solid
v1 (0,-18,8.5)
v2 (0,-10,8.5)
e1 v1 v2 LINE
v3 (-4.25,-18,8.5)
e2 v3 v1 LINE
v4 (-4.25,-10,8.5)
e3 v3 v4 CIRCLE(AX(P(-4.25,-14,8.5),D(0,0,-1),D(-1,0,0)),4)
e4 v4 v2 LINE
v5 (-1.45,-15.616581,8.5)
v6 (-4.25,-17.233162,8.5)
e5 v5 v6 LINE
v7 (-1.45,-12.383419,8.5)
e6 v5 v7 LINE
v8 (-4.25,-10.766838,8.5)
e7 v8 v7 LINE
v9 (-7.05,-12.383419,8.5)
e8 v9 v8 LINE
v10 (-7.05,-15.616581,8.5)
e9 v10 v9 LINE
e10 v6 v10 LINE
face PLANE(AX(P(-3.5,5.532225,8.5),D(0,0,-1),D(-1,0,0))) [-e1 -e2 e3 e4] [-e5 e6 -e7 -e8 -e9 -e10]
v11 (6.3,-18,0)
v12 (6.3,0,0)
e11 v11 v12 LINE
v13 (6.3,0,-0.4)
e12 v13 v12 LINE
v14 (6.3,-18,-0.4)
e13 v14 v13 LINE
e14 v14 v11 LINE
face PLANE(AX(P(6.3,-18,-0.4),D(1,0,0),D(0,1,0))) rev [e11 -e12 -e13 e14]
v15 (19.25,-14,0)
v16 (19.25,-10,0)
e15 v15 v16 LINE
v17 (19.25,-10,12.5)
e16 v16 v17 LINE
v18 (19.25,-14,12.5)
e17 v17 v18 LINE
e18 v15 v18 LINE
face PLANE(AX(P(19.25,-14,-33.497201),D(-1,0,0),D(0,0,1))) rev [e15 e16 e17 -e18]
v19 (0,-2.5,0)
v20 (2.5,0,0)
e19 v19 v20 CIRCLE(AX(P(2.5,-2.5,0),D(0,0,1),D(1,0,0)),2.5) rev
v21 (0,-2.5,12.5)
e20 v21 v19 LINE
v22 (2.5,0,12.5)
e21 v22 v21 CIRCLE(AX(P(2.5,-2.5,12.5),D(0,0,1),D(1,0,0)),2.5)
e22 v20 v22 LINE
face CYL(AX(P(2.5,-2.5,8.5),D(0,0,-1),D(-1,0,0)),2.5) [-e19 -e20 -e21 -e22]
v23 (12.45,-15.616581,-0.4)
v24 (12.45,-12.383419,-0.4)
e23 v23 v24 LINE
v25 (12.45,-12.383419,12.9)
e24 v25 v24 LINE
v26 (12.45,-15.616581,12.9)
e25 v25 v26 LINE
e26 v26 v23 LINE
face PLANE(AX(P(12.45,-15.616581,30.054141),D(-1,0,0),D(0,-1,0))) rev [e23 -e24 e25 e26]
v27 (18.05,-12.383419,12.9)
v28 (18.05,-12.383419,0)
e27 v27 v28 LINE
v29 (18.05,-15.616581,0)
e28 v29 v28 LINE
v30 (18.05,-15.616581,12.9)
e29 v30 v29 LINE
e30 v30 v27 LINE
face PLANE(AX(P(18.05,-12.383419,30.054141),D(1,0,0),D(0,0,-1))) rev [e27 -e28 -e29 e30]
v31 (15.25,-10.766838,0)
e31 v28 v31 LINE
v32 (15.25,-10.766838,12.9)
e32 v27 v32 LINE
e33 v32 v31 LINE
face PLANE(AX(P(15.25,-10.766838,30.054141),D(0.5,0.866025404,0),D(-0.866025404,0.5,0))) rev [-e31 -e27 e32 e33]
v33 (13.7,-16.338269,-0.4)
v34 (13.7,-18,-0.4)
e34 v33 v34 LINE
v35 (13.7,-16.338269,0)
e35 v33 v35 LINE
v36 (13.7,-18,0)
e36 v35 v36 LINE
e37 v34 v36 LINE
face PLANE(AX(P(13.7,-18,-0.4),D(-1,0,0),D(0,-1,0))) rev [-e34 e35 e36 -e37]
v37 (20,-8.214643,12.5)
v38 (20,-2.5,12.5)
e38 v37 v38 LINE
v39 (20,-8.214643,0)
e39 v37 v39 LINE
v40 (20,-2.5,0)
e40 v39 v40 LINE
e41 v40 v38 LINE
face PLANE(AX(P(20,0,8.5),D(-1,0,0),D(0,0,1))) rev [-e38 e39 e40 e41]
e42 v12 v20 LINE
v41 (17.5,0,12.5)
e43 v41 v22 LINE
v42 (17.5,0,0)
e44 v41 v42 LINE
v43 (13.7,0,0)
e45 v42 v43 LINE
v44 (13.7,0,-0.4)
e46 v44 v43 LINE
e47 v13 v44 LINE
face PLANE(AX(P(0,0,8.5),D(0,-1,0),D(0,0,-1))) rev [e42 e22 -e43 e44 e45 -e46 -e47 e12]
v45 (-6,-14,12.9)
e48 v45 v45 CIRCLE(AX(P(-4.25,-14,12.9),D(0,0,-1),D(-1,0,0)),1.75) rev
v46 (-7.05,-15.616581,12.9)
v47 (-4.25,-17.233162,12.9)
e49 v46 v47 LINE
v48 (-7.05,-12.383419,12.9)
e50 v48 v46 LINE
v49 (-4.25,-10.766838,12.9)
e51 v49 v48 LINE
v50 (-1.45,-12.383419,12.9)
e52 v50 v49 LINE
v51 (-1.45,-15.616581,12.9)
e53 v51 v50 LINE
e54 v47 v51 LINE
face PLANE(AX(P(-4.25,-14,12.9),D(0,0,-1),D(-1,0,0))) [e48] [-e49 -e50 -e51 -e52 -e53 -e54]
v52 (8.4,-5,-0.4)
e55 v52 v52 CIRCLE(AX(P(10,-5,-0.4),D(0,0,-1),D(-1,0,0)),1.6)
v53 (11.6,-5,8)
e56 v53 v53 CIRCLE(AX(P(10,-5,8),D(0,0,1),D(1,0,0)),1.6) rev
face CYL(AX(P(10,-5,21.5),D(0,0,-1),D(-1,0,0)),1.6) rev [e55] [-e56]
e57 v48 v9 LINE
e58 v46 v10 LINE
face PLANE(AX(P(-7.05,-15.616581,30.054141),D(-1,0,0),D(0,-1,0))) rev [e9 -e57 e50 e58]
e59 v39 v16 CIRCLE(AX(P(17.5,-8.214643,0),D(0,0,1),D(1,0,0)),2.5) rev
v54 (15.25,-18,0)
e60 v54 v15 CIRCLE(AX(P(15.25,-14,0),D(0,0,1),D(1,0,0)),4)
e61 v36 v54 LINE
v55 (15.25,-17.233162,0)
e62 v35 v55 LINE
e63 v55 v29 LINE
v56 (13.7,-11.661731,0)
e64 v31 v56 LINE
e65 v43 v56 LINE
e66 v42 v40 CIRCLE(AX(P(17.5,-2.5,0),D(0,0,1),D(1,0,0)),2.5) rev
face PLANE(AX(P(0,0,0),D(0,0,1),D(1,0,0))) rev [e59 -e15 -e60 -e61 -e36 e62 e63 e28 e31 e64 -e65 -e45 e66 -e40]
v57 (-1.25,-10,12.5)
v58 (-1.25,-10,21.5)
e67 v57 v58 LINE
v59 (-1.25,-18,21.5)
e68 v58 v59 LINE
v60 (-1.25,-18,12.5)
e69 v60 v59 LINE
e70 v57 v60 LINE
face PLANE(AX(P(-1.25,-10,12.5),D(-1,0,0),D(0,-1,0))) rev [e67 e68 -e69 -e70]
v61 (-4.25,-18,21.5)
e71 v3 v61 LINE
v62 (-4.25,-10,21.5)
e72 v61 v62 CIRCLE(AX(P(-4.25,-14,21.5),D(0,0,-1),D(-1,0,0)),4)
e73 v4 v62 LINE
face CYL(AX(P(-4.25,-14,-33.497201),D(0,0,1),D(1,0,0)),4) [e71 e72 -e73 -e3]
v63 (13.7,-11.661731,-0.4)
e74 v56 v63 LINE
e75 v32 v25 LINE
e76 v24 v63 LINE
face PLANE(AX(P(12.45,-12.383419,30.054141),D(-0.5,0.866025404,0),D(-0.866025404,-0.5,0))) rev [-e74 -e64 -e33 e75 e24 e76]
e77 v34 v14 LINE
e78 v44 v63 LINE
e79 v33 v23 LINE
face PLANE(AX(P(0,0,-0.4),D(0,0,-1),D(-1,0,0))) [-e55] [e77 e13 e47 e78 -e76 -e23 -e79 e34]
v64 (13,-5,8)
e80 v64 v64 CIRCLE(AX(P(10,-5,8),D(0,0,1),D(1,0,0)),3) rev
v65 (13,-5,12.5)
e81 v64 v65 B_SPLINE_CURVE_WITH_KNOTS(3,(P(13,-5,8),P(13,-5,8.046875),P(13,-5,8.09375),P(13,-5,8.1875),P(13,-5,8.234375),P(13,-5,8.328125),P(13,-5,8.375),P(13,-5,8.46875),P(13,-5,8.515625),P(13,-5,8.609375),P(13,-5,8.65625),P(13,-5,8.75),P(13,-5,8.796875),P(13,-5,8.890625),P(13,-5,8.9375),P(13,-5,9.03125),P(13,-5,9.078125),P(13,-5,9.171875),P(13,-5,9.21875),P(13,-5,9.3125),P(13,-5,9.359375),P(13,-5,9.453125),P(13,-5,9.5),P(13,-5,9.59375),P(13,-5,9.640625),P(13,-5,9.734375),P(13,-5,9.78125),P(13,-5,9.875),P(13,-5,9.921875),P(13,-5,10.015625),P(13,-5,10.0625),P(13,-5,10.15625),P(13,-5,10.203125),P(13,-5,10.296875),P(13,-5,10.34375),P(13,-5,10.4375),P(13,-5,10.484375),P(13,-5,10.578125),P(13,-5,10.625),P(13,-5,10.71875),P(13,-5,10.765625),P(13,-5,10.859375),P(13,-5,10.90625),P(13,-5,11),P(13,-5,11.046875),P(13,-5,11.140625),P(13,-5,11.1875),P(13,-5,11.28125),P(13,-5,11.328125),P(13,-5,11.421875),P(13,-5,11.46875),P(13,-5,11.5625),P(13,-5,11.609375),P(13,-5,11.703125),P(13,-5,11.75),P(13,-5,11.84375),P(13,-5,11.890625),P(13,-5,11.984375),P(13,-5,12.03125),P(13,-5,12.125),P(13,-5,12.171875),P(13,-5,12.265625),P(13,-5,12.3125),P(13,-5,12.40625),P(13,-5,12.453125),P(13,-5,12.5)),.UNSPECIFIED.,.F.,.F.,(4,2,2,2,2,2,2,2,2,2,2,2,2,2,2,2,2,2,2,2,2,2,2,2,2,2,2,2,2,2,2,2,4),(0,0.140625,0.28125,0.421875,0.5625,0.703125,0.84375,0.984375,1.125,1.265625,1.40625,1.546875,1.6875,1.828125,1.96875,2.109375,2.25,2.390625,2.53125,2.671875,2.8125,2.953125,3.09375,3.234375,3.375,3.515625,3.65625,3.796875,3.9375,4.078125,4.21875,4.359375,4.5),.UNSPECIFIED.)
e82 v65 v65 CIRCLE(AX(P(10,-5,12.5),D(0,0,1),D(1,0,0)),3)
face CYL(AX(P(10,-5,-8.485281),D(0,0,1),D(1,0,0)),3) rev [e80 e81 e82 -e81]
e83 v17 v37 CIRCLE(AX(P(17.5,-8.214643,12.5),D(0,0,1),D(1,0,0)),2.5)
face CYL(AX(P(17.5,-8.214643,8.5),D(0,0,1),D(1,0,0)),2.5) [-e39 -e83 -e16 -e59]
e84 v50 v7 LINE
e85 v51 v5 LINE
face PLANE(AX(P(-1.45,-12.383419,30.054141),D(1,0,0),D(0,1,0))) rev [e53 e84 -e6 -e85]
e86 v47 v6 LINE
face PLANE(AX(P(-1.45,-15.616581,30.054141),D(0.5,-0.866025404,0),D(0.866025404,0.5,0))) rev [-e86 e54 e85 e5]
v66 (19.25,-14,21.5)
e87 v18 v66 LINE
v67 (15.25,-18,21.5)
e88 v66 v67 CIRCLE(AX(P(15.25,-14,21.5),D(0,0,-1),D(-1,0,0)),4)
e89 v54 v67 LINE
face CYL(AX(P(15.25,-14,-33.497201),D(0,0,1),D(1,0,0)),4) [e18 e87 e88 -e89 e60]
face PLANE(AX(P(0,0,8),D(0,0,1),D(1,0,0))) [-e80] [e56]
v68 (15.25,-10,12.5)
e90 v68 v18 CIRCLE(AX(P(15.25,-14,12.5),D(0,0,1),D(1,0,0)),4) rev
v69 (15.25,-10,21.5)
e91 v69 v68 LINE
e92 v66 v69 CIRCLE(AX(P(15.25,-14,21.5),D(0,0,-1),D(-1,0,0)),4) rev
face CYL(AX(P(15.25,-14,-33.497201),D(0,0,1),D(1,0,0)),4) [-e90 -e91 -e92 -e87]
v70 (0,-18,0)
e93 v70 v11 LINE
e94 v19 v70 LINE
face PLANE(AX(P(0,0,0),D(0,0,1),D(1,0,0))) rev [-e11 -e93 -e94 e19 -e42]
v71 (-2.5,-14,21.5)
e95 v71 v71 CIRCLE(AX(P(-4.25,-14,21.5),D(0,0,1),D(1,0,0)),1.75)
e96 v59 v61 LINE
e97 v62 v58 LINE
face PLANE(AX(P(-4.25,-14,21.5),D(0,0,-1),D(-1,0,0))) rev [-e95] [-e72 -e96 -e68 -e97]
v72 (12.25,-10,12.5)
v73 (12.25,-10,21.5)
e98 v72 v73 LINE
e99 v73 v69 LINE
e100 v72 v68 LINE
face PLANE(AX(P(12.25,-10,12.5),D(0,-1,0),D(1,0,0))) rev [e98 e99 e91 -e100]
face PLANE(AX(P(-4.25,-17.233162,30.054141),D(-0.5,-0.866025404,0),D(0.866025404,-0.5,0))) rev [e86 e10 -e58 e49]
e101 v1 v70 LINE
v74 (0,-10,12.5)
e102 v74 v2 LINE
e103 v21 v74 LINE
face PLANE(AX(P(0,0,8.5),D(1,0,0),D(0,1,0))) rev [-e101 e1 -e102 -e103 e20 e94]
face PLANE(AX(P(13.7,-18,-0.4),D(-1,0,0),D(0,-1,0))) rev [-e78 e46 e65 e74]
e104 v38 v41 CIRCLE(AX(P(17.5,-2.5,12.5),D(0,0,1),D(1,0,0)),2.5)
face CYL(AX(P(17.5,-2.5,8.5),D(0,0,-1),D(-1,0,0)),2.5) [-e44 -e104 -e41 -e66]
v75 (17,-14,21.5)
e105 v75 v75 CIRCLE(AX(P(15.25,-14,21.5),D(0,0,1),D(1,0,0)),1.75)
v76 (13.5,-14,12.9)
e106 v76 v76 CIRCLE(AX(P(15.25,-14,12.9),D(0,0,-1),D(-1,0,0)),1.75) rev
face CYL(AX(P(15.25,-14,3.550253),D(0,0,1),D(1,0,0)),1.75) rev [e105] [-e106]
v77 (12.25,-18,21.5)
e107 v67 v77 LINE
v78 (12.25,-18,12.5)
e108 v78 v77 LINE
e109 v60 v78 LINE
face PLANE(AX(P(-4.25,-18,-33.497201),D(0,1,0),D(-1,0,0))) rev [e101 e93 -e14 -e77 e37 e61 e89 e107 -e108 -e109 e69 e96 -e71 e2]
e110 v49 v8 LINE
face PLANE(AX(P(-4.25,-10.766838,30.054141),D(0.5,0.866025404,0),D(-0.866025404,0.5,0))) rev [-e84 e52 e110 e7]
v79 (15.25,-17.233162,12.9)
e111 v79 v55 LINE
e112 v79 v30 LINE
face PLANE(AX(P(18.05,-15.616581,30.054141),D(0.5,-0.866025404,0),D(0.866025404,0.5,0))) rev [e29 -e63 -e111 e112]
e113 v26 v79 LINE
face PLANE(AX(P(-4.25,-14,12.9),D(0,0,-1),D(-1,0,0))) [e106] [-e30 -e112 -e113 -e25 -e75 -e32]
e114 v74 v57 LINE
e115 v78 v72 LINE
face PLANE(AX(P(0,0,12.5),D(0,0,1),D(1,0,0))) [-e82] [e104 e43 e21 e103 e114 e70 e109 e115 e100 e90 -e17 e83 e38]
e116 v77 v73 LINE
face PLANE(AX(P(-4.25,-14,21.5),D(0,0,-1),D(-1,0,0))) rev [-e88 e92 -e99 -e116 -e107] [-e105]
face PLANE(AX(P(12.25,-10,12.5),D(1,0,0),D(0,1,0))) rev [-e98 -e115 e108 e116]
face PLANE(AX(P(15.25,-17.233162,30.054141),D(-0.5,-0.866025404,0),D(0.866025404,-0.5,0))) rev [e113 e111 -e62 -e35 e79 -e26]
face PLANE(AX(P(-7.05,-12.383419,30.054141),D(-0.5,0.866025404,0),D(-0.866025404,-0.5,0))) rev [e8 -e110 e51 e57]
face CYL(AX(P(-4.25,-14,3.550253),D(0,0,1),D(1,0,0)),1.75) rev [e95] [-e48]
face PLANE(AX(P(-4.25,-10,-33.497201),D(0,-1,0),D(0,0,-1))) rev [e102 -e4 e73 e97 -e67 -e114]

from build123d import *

# Parameters (mm, degrees)
SKETCH_1_W               = 20
SKETCH_1_H               = 10
EXTRUDE_1_DEPTH          = 8.5
EXTRUDE_3_DEPTH          = 8.5
EXTRUDE_3_DEPTH_BACK     = 13
CUT_EXTRUDE_1_DEPTH      = 9
SKETCH_11_W              = 7.4
SKETCH_11_H              = 18
EXTRUDE_5_DEPTH          = 0.4
SKETCH_14_W              = 13
SKETCH_14_H              = 8.5
CUT_EXTRUDE_7_DEPTH      = 8
SKETCH_6_R               = 1.75
CUT_EXTRUDE_2_DEPTH      = 12.8
CUT_EXTRUDE_3_DEPTH      = 35.441980199
CUT_EXTRUDE_3_DEPTH_BACK = 12.9
SKETCH_15_W              = 3.5
SKETCH_15_H              = 8
CUT_EXTRUDE_8_DEPTH      = 8.5
SKETCH_12_R              = 1.6
CUT_EXTRUDE_4_DEPTH      = 35.693082884
SKETCH_13_R              = 3
CUT_EXTRUDE_5_DEPTH      = 4.5
FILLET_1_R               = 2.5
FILLET_2_R               = 4


# Some blends are built 0.0001 mm under size
with BuildPart() as part:
    # Эскиз1 → Бобышка-Вытянуть1 (new body)
    with BuildSketch(Plane.XY):
        with Locations((10, -5)):
            Rectangle(SKETCH_1_W, SKETCH_1_H)
    extrude(amount=EXTRUDE_1_DEPTH)

    # Эскиз4 → Бобышка-Вытянуть3 (add, two sides: drawn at the far end of the back side and taken through both)
    with BuildSketch(Plane(origin=(0, 0, 8.5), x_dir=(-1, 0, 0), z_dir=(0, 0, -1)).offset(-EXTRUDE_3_DEPTH_BACK)):
        with BuildLine():
            Line((4.25, -10), (0, -10))
            Line((0, -10), (0, 0))
            Line((0, 0), (-20, 0))
            Line((-20, 0), (-20, -10))
            Line((-20, -10), (-19.25, -10))
            Line((-19.25, -10), (-19.25, -14))
            ThreePointArc((-19.25, -14), (-18.078427125, -16.828427125), (-15.25, -18))
            Line((-15.25, -18), (4.25, -18))
            ThreePointArc((4.25, -18), (8.25, -14), (4.25, -10))
        make_face()
    extrude(amount=EXTRUDE_3_DEPTH + EXTRUDE_3_DEPTH_BACK)

    # Эскиз5 → Вырез-Вытянуть1 (cut)
    with BuildSketch(Plane.XY.offset(21.5)):
        Polygon((-1.25, -10), (-1.25, -18), (12.25, -18), (12.25, -10), (20, -10), (20, 0), (0, 0), (0, -10), align=None)
    extrude(amount=-CUT_EXTRUDE_1_DEPTH, mode=Mode.SUBTRACT)

    # Эскиз11 → Бобышка-Вытянуть5 (add)
    with BuildSketch(Plane(origin=(0, 0, 0), x_dir=(-1, 0, 0), z_dir=(0, 0, -1))):
        with Locations((-10, -9)):
            Rectangle(SKETCH_11_W, SKETCH_11_H)
    extrude(amount=EXTRUDE_5_DEPTH)

    # Эскиз14 → Вырез-Вытянуть7 (cut)
    with BuildSketch(Plane(origin=(9.75, -18, 0), x_dir=(-1, 0, 0), z_dir=(0, 1, 0))):
        with Locations((19.75, 4.25)):
            Rectangle(SKETCH_14_W, SKETCH_14_H)
    extrude(amount=CUT_EXTRUDE_7_DEPTH, mode=Mode.SUBTRACT)

    # Эскиз6 → Вырез-Вытянуть2 (cut)
    with BuildSketch(Plane.XY.offset(21.5)):
        with Locations((-4.25, -14)):
            Circle(SKETCH_6_R)
        with Locations((15.25, -14)):
            Circle(SKETCH_6_R)
    extrude(amount=-CUT_EXTRUDE_2_DEPTH, mode=Mode.SUBTRACT)

    # Эскиз7 → Вырез-Вытянуть3 (cut, two sides: drawn at the far end of the back side and taken through both)
    with BuildSketch(Plane(origin=(0, 0, 0), x_dir=(-1, 0, 0), z_dir=(0, 0, -1)).offset(-CUT_EXTRUDE_3_DEPTH_BACK)):
        Polygon((-15.25, -10.766838493), (-18.05, -12.383419246), (-18.05, -15.616580754), (-15.25, -17.233161507), (-12.45, -15.616580754), (-12.45, -12.383419246), align=None)
        Polygon((4.25, -10.766838493), (1.45, -12.383419246), (1.45, -15.616580754), (4.25, -17.233161507), (7.05, -15.616580754), (7.05, -12.383419246), align=None)
    extrude(amount=CUT_EXTRUDE_3_DEPTH + CUT_EXTRUDE_3_DEPTH_BACK, mode=Mode.SUBTRACT)

    # Эскиз15 → Вырез-Вытянуть8 (cut)
    with BuildSketch(Plane(origin=(0, 0, 0), x_dir=(-1, 0, 0), z_dir=(0, 0, -1))):
        with Locations((1.75, -14)):
            Rectangle(SKETCH_15_W, SKETCH_15_H)
    extrude(amount=-CUT_EXTRUDE_8_DEPTH, mode=Mode.SUBTRACT)

    # Эскиз12 → Вырез-Вытянуть4 (cut, through all)
    with BuildSketch(Plane(origin=(0, 0, -0.4), x_dir=(-1, 0, 0), z_dir=(0, 0, -1))):
        with Locations((-10, -5)):
            Circle(SKETCH_12_R)
    extrude(amount=-CUT_EXTRUDE_4_DEPTH, mode=Mode.SUBTRACT)

    # Эскиз13 → Вырез-Вытянуть5 (cut)
    with BuildSketch(Plane.XY.offset(12.5)):
        with Locations((10, -5)):
            Circle(SKETCH_13_R)
    extrude(amount=-CUT_EXTRUDE_5_DEPTH, mode=Mode.SUBTRACT)

    # Скругление1
    # the kernel refuses this fillet: 2.5 mm, written as the material it takes off along each edge
    with BuildSketch(Plane(origin=(0, 0, -6.25), x_dir=(1, 0, 0), z_dir=(0, 0, 1)), Plane(origin=(20, 0, 18.75), x_dir=(-1, 0, 0), z_dir=(0, 0, -1))) as fillet_1_piece_1:
        with BuildLine():
            CenterArc((FILLET_1_R, -FILLET_1_R), FILLET_1_R, 90, 90)
            Line((0, -FILLET_1_R), (-FILLET_1_R * 0.02, -FILLET_1_R))
            Line((-FILLET_1_R * 0.02, -FILLET_1_R), (-FILLET_1_R * 0.02, FILLET_1_R * 0.02))
            Line((-FILLET_1_R * 0.02, FILLET_1_R * 0.02), (FILLET_1_R, FILLET_1_R * 0.02))
            Line((FILLET_1_R, FILLET_1_R * 0.02), (FILLET_1_R, 0))
        make_face()
    extrude(amount=25, mode=Mode.SUBTRACT)
    with BuildSketch(Plane(origin=(20, -10, 16.963392768), x_dir=(0, 1, 0), z_dir=(0, 0, -1))) as fillet_1_piece_2:
        with BuildLine():
            CenterArc((1.785357107, -2.5), FILLET_1_R, 90, 45.572995999)
            Line((0, -0.75), (-0.035707142, -0.715))
            ThreePointArc((-0.035707142, -0.715), (-0.05, -0.375), (-0.05, 0))
            Line((-0.05, 0), (0, 0.05))
            Line((0, 0.05), (1.785357107, 0.05))
            Line((1.785357107, 0.05), (1.785357107, 0))
        make_face()
    extrude(amount=21.426785536, mode=Mode.SUBTRACT)

    # Скругление2
    fillet_2_edges = [part.edges().sort_by_distance(p)[0] for p in [
        (19.25, -10, 17),
    ]]
    fillet(fillet_2_edges, radius=FILLET_2_R - 0.0001)  # a hair under: the kernel refuses the full size


solid = part.part
